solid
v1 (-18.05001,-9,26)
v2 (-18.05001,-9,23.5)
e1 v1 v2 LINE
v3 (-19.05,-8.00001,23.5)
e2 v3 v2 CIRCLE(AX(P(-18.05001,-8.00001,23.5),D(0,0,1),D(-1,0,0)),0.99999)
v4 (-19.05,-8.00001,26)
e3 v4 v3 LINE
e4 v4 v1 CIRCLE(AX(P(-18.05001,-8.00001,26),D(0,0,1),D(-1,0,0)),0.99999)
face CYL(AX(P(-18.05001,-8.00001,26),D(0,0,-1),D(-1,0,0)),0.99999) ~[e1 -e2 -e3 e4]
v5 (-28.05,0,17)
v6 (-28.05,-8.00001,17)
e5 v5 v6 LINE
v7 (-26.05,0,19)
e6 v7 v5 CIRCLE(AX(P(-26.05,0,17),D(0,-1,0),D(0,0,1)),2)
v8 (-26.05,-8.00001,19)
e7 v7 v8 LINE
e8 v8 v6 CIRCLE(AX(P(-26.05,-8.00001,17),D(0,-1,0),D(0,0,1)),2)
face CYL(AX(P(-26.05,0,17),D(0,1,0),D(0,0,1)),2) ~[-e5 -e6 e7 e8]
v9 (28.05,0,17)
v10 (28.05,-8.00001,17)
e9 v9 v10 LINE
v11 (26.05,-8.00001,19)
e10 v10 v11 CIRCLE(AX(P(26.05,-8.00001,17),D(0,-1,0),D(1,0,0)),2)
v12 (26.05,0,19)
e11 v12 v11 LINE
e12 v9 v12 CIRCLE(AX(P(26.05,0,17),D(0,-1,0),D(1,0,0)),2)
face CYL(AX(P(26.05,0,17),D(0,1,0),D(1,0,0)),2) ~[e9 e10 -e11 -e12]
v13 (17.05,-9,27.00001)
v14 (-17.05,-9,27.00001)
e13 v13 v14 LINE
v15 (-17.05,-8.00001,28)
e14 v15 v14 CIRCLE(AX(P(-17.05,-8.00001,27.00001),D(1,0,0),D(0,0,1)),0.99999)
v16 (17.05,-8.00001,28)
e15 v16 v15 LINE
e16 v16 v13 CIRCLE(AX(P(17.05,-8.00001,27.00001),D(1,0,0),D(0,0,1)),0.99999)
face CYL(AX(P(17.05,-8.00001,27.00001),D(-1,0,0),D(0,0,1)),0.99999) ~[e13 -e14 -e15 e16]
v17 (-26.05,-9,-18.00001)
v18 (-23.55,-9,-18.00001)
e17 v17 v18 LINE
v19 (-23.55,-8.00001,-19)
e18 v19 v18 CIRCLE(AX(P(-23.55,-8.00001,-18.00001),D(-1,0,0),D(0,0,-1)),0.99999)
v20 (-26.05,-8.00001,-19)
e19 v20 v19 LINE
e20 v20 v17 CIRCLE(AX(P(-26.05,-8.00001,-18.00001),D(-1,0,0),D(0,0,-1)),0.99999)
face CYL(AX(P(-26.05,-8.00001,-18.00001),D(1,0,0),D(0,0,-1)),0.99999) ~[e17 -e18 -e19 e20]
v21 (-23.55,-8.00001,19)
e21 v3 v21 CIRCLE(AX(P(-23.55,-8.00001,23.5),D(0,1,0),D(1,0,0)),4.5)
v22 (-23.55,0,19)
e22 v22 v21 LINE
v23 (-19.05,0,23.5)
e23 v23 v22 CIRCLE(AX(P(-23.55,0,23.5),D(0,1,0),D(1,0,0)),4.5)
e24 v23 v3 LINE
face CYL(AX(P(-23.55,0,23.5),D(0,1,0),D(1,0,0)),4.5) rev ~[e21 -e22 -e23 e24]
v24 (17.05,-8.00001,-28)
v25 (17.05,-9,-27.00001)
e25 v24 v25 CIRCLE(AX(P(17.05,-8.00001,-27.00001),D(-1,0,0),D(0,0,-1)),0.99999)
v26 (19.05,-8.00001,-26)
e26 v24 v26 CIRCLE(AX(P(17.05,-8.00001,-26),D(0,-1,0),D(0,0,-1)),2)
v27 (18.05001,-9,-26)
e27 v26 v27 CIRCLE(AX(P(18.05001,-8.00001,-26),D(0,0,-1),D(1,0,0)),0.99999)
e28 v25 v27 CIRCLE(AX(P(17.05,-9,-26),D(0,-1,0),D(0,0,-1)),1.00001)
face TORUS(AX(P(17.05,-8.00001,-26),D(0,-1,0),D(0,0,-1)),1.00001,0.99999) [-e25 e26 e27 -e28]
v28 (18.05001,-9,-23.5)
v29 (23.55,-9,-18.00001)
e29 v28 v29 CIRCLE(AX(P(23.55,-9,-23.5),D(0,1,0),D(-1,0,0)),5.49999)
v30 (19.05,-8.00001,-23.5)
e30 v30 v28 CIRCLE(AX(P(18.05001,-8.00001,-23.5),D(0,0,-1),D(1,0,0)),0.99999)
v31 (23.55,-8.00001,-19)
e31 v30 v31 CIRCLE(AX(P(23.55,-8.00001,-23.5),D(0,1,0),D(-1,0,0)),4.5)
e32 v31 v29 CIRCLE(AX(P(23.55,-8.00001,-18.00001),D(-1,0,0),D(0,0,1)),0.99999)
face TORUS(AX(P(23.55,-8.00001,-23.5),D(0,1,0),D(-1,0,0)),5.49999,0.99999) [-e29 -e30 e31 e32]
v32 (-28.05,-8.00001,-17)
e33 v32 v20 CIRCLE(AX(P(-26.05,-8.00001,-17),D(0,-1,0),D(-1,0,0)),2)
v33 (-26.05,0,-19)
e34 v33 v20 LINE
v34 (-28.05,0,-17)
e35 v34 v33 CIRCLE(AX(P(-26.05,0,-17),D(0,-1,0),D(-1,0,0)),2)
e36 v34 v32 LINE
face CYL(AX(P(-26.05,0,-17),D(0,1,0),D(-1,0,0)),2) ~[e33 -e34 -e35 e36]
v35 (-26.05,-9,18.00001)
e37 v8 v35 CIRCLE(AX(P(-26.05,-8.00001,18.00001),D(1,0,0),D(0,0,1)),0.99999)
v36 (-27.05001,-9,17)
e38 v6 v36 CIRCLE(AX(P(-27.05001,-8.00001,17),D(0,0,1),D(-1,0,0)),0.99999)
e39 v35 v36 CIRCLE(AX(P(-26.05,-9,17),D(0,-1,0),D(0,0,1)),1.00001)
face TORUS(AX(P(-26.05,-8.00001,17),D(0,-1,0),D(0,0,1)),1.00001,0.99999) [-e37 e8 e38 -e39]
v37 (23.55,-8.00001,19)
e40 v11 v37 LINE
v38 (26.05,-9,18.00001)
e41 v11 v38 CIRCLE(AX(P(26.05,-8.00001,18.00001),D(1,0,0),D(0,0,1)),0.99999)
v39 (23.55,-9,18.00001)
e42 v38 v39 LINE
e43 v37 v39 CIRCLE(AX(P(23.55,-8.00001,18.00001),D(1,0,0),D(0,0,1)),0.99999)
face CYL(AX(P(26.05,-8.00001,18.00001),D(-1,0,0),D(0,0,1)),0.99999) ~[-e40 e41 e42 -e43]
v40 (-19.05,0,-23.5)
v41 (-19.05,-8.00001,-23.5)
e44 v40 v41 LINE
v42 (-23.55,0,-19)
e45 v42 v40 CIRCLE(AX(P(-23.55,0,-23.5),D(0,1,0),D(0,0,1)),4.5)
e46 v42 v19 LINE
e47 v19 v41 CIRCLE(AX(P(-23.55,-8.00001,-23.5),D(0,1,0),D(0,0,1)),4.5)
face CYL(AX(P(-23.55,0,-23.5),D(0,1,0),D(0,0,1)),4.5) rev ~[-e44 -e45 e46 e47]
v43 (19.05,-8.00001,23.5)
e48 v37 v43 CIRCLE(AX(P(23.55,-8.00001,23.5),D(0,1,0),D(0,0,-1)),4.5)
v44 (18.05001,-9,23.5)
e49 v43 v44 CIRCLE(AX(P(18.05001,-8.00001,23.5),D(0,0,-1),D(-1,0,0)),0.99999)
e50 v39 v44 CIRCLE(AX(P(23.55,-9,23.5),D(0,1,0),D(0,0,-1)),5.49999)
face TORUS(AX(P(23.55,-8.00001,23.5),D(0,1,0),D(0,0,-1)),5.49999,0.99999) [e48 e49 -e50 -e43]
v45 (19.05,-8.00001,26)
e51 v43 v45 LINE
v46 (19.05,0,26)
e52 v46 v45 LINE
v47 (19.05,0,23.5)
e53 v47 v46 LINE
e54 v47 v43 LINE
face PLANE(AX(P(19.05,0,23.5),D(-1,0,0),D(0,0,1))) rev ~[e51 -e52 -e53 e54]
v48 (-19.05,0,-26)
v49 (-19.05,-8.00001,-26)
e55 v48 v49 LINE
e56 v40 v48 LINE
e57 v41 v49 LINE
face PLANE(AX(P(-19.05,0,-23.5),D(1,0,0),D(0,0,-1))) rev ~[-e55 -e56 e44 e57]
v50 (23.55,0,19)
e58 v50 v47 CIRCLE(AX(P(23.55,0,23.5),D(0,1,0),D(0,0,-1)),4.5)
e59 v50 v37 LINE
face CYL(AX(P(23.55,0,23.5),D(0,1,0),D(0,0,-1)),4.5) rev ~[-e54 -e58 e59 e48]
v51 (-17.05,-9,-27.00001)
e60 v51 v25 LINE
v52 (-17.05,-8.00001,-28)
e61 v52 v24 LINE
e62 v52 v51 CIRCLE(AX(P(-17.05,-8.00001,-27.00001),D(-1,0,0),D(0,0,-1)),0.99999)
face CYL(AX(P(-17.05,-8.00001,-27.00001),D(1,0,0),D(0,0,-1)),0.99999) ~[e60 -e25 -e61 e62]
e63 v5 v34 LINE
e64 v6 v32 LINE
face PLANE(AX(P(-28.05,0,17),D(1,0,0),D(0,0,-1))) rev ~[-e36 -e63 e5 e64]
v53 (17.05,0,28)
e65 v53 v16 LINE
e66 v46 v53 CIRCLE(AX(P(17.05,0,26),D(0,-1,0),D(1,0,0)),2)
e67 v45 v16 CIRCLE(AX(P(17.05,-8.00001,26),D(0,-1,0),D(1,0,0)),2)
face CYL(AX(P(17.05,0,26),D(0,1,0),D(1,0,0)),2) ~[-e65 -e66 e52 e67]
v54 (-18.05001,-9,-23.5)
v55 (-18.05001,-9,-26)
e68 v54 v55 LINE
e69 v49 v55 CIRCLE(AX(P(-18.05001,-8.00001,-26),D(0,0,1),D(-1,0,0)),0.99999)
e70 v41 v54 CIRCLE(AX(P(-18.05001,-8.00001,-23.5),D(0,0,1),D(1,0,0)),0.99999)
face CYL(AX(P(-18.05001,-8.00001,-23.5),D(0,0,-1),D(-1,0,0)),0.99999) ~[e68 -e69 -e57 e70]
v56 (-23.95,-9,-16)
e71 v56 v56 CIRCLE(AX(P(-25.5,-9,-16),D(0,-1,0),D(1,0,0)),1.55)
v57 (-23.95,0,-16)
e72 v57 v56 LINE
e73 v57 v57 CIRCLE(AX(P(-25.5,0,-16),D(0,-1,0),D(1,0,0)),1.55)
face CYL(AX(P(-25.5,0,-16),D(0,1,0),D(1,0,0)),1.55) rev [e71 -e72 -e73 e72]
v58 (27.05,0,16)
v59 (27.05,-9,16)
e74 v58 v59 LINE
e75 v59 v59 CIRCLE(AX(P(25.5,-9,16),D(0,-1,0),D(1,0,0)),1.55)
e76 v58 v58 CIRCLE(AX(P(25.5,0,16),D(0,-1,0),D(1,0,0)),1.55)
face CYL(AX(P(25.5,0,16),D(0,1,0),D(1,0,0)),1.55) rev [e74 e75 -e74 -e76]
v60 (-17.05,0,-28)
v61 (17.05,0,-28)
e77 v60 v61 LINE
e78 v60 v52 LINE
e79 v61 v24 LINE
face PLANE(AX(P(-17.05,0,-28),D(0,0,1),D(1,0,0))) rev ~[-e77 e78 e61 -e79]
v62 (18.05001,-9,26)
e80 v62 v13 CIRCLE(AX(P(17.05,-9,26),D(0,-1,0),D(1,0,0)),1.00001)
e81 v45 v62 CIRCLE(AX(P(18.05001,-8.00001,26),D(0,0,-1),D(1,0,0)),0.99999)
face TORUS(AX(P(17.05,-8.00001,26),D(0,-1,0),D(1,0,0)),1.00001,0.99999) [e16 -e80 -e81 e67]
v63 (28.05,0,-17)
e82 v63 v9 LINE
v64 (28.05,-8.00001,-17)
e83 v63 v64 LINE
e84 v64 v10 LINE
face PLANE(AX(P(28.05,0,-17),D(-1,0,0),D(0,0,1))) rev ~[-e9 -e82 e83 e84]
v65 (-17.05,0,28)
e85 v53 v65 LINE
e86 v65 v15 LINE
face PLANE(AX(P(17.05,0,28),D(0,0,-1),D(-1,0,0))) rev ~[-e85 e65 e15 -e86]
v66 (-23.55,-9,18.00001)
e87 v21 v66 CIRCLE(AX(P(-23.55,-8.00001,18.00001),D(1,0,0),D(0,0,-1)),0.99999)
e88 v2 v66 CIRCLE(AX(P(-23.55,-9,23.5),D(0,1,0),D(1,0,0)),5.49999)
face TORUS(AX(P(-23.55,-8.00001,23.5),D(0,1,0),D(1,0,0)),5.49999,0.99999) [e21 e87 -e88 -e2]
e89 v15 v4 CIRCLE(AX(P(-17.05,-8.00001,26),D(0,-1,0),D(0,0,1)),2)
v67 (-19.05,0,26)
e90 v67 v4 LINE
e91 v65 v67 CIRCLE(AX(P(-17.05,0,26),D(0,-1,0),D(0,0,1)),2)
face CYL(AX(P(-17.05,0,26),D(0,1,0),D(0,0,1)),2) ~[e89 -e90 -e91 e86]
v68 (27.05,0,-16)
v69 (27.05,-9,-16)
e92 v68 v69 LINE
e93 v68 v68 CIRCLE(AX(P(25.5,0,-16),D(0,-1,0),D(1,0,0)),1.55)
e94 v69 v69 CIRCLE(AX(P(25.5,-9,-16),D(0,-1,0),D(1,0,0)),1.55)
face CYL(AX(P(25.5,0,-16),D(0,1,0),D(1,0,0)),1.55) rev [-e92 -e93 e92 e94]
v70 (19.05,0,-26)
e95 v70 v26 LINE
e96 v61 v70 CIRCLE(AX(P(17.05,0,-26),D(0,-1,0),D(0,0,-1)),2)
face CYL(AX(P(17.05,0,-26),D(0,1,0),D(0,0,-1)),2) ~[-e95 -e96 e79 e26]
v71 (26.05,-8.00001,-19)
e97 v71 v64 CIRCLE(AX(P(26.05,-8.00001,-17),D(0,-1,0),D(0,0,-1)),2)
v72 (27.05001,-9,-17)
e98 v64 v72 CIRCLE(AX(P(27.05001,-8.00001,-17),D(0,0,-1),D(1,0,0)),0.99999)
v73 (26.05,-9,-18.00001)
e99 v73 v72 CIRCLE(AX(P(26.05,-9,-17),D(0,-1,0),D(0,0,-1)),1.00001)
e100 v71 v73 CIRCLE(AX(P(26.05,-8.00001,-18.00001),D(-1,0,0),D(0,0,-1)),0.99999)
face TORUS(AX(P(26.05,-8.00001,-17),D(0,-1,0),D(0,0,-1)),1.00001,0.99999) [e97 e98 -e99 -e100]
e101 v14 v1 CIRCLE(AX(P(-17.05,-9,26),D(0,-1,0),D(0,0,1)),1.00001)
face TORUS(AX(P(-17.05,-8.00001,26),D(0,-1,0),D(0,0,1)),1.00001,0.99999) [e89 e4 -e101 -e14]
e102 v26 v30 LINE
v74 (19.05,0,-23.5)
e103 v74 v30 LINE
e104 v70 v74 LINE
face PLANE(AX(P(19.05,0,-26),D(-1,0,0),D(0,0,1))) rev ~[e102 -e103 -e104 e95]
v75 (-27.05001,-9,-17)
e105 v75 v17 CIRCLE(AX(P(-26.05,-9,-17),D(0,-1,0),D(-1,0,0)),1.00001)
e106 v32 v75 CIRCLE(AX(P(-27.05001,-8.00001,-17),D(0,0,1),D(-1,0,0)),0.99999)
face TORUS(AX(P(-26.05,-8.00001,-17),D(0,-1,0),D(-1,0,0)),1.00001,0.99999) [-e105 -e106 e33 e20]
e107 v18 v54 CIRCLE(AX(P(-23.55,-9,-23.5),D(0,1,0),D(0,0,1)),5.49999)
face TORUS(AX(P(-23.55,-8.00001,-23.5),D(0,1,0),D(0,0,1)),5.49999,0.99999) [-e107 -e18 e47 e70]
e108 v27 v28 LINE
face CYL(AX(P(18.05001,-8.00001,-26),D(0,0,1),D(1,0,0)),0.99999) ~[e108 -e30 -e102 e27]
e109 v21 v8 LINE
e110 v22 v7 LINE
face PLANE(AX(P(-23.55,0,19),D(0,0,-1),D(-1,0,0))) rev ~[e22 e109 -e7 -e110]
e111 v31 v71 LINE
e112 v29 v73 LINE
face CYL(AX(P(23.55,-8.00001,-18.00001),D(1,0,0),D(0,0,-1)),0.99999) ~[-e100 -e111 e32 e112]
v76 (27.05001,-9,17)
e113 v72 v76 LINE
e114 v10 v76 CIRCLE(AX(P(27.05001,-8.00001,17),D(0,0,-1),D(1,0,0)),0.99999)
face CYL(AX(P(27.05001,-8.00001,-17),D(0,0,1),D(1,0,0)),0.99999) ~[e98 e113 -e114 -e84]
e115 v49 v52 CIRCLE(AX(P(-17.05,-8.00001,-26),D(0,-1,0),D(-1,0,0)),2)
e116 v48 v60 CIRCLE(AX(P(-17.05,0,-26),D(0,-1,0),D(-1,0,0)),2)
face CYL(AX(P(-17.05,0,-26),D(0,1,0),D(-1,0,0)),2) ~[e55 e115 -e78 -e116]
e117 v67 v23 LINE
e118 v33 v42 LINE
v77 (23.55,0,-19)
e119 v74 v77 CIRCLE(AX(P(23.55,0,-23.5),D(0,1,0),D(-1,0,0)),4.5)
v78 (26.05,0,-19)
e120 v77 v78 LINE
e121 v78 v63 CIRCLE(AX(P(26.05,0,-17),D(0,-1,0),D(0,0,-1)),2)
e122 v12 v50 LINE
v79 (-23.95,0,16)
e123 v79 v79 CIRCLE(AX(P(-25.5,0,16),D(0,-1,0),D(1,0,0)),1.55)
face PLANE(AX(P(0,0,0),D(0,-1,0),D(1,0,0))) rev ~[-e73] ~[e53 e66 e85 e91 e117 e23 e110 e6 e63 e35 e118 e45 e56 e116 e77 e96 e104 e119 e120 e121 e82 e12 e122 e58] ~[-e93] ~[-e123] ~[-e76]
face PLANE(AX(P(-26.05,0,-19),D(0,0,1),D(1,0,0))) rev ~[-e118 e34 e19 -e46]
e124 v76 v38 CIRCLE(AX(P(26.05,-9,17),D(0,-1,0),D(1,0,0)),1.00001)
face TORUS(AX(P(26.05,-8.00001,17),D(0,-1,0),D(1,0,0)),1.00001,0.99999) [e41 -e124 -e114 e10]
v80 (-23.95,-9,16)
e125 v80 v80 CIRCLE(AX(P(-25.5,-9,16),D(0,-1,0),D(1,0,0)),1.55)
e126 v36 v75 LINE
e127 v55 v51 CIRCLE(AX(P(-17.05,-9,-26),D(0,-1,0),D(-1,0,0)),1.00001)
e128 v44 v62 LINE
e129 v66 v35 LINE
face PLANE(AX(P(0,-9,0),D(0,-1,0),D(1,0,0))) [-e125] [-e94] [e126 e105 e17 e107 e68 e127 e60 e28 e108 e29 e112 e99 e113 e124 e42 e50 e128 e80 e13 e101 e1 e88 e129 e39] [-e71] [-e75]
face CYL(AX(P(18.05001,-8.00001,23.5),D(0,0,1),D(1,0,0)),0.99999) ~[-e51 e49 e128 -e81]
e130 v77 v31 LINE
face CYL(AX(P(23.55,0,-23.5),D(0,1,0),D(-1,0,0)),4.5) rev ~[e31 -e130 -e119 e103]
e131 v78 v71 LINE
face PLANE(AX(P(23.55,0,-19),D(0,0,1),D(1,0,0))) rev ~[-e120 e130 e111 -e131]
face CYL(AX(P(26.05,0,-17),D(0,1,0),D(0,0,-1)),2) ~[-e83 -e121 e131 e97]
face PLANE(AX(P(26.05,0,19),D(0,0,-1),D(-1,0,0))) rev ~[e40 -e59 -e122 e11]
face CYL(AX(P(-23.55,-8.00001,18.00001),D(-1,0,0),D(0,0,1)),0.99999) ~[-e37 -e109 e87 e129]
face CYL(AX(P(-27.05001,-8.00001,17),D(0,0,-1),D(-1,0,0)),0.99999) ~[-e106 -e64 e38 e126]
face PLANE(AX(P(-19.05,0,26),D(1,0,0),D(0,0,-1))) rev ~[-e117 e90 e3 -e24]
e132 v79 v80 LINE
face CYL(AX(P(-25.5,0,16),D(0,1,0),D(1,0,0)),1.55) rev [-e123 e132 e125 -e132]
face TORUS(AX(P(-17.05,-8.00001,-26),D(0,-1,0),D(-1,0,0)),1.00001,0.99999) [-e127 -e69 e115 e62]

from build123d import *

# Parameters (mm, degrees)
F0_R     = 1.55
F1_DEPTH = 9
F2_R     = 0.99999


# Not quite as in the source:
# - a fillet or chamfer is up to 0.001 mm smaller than in the source, because OpenCascade refuses the exact size


with BuildPart() as f1:
    # F0 (on Front) → F1 (new body)
    with BuildSketch(Plane.XZ):
        with BuildLine():
            Line((17.05, 28), (-17.05, 28))
            ThreePointArc((-17.05, 28), (-18.4642135624, 27.4142135624), (-19.05, 26))
            Line((-19.05, 26), (-19.05, 23.5))
            ThreePointArc((-19.05, 23.5), (-20.3680194847, 20.3180194847), (-23.55, 19))
            Line((-23.55, 19), (-26.05, 19))
            ThreePointArc((-26.05, 19), (-27.4642135624, 18.4142135624), (-28.05, 17))
            Line((-28.05, 17), (-28.05, -17))
            ThreePointArc((-28.05, -17), (-27.4642135624, -18.4142135624), (-26.05, -19))
            Line((-26.05, -19), (-23.55, -19))
            ThreePointArc((-23.55, -19), (-20.3680194847, -20.3180194847), (-19.05, -23.5))
            Line((-19.05, -23.5), (-19.05, -26))
            ThreePointArc((-19.05, -26), (-18.4642135624, -27.4142135624), (-17.05, -28))
            Line((-17.05, -28), (17.05, -28))
            ThreePointArc((17.05, -28), (18.4642135624, -27.4142135624), (19.05, -26))
            Line((19.05, -26), (19.05, -23.5))
            ThreePointArc((19.05, -23.5), (20.3680194847, -20.3180194847), (23.55, -19))
            Line((23.55, -19), (26.05, -19))
            ThreePointArc((26.05, -19), (27.4642135624, -18.4142135624), (28.05, -17))
            Line((28.05, -17), (28.05, 17))
            ThreePointArc((28.05, 17), (27.4642135624, 18.4142135624), (26.05, 19))
            Line((26.05, 19), (23.55, 19))
            ThreePointArc((23.55, 19), (20.3680194847, 20.3180194847), (19.05, 23.5))
            Line((19.05, 23.5), (19.05, 26))
            ThreePointArc((19.05, 26), (18.4642135624, 27.4142135624), (17.05, 28))
        make_face()
        with Locations((-25.5, -16)):
            Circle(F0_R, mode=Mode.SUBTRACT)
        with Locations((25.5, -16)):
            Circle(F0_R, mode=Mode.SUBTRACT)
        with Locations((-25.5, 16)):
            Circle(F0_R, mode=Mode.SUBTRACT)
        with Locations((25.5, 16)):
            Circle(F0_R, mode=Mode.SUBTRACT)
    extrude(amount=F1_DEPTH)

    # F2 (radius 1 in the source; OpenCascade refuses exactly that, so slightly less here)
    f2_edges = [f1.edges().sort_by_distance(p)[0] for p in [
        (-27.464214, -9, 18.414214),
    ]]
    fillet(f2_edges, radius=F2_R)


solid = f1.part
